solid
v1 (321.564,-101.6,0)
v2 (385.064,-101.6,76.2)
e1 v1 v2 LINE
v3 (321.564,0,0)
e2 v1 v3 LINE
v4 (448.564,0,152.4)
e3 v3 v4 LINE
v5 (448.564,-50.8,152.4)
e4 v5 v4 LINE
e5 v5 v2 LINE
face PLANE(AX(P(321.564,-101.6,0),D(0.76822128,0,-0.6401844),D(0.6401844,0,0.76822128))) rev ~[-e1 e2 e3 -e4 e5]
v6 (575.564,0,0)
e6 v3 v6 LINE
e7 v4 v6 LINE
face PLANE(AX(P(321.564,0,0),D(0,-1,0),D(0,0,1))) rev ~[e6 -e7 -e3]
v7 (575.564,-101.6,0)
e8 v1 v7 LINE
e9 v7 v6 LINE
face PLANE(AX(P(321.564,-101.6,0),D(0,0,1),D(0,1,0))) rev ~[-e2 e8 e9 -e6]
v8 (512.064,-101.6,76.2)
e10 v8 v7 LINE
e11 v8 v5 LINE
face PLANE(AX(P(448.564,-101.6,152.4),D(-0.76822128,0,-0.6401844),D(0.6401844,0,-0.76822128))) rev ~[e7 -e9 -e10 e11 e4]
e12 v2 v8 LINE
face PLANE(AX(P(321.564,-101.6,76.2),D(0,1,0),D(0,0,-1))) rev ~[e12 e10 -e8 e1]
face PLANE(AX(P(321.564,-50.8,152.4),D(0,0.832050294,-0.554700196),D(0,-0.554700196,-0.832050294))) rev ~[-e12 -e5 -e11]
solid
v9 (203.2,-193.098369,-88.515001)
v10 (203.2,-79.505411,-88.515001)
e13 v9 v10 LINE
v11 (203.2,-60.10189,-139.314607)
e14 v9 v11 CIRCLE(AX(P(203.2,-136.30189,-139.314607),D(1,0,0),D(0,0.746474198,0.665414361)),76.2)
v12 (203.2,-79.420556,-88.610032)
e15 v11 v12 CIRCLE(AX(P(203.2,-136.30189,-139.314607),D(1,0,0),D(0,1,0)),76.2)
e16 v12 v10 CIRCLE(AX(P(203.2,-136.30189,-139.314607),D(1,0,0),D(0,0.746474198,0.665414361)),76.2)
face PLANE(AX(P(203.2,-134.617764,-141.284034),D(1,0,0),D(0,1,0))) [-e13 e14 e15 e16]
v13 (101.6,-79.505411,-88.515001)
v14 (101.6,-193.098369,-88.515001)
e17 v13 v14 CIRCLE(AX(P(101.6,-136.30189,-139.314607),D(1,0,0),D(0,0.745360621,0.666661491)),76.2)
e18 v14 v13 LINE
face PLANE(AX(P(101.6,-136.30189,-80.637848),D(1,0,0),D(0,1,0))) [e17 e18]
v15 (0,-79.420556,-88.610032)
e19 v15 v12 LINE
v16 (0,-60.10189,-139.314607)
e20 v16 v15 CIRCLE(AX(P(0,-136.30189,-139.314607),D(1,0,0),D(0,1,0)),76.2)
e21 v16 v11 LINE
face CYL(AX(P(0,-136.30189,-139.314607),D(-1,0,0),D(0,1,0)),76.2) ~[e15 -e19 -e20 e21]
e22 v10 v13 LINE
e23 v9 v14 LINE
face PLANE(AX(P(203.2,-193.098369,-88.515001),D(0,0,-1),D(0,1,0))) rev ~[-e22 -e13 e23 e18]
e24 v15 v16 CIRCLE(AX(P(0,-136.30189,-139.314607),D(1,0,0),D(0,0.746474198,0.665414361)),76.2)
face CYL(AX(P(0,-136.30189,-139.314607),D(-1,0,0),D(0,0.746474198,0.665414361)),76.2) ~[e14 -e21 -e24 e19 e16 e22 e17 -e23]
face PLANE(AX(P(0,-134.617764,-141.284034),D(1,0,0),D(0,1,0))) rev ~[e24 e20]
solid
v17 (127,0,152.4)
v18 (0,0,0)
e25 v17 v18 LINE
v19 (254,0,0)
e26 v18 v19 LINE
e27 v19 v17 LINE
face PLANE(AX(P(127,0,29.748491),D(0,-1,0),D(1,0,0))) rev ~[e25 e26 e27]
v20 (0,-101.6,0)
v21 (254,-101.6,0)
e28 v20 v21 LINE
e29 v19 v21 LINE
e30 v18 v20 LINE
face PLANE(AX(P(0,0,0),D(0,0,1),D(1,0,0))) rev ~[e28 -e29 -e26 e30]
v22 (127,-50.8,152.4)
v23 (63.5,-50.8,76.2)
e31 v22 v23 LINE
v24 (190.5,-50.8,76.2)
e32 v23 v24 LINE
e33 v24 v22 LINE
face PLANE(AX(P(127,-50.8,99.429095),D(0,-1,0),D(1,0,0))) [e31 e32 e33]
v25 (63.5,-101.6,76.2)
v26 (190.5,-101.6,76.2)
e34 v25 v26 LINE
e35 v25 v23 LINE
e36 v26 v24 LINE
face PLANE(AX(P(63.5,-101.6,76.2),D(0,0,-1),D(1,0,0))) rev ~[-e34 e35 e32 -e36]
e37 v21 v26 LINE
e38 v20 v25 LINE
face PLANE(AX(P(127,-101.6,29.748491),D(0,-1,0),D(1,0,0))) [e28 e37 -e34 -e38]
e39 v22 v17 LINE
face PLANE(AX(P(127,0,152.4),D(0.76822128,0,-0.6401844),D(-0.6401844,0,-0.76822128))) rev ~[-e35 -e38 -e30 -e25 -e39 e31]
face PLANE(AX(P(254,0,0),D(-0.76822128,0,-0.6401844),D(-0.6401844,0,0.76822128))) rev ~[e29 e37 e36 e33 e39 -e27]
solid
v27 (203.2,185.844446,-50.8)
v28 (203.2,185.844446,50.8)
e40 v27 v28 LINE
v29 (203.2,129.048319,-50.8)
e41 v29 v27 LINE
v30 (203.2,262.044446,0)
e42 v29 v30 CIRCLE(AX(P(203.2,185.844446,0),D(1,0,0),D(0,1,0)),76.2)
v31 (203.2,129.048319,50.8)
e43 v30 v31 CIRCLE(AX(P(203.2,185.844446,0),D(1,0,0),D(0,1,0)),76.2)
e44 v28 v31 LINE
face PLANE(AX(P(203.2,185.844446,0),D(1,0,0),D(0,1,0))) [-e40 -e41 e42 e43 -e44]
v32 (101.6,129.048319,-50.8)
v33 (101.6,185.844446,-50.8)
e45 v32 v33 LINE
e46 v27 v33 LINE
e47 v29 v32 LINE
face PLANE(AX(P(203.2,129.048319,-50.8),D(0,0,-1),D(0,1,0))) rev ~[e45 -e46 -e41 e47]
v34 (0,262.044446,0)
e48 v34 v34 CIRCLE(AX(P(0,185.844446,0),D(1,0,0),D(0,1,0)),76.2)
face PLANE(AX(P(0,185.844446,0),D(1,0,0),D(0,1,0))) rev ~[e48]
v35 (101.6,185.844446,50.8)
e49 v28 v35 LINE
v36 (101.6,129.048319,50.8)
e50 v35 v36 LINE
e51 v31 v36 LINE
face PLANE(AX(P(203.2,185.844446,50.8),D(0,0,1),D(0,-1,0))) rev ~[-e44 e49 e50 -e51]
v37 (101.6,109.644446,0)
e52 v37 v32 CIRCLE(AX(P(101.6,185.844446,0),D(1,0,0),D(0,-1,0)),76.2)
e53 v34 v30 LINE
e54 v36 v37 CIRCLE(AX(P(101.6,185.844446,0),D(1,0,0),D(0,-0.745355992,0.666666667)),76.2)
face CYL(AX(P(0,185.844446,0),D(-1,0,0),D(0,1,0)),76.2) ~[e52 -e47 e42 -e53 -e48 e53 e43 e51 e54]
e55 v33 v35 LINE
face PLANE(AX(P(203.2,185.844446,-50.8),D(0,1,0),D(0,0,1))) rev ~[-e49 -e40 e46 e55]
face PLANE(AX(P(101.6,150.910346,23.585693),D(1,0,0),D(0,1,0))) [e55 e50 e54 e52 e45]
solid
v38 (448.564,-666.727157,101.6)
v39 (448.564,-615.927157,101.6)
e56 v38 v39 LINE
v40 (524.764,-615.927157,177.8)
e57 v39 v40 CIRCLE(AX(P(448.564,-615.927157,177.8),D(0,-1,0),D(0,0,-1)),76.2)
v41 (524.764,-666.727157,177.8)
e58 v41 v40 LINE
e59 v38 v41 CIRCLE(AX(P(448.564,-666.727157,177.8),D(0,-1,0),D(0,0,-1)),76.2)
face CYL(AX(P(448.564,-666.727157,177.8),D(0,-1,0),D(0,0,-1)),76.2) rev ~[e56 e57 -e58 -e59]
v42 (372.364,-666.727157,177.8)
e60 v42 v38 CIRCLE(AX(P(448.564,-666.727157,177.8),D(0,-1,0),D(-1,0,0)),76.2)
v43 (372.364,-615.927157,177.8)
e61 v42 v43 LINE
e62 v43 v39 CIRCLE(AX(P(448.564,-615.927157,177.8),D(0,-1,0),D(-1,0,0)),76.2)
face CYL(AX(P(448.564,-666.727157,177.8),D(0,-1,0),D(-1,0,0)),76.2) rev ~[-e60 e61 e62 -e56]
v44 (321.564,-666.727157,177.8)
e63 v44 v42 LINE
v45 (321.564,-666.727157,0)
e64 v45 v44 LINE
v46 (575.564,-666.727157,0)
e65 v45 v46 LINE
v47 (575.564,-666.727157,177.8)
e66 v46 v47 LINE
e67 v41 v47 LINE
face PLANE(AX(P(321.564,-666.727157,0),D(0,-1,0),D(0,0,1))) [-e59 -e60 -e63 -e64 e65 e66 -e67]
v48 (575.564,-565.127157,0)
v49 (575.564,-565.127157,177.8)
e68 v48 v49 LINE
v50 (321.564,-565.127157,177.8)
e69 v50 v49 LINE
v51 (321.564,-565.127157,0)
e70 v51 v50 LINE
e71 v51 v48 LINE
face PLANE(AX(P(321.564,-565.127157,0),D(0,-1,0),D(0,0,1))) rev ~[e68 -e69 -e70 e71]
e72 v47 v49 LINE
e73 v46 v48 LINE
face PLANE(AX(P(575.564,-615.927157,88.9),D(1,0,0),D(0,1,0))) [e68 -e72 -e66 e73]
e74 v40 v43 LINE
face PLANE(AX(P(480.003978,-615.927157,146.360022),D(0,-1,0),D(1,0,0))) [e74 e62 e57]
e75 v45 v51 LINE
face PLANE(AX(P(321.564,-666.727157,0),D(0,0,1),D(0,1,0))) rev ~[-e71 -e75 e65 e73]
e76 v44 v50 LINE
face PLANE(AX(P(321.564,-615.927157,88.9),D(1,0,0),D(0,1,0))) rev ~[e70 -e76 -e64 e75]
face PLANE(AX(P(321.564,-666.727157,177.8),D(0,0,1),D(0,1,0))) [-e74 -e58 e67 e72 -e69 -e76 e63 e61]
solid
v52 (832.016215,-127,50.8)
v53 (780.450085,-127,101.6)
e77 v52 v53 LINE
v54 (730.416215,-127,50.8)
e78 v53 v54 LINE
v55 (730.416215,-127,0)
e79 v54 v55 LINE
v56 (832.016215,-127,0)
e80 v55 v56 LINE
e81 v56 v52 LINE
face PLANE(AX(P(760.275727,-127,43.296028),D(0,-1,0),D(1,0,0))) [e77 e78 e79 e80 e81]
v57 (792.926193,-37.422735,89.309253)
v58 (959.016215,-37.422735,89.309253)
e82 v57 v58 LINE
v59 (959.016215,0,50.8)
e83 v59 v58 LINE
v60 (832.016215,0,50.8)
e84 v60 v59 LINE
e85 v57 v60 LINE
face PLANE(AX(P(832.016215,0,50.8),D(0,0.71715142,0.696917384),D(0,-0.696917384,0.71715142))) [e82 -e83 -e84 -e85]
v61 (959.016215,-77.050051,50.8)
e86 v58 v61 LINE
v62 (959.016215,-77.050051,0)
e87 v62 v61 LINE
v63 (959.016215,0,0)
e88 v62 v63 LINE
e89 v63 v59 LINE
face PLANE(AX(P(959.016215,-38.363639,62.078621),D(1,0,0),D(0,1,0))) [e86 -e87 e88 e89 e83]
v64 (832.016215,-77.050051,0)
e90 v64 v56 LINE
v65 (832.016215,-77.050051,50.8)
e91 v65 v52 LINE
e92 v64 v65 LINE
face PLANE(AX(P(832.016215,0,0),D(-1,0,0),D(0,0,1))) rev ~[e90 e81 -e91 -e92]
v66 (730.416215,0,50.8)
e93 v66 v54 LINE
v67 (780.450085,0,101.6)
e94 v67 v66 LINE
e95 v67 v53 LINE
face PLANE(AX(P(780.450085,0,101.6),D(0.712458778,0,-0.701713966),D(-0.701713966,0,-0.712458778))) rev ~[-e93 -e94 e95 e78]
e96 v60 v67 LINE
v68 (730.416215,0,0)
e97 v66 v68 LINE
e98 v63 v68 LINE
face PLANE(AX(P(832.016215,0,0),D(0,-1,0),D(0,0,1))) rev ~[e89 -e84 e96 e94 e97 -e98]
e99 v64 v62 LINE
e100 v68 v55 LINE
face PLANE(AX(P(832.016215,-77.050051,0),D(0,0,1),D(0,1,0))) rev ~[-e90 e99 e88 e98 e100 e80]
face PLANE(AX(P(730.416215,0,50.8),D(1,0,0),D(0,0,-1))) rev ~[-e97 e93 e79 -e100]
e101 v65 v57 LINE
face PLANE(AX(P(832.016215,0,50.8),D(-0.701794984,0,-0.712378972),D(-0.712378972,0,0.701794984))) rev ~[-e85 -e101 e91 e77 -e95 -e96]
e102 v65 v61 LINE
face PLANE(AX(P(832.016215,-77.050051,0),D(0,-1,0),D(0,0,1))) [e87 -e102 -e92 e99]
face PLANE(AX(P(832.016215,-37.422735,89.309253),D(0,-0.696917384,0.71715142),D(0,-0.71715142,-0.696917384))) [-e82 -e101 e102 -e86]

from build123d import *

# Parameters (mm, degrees)
F1_DEPTH  = 101.6
F3_DEPTH  = 50.8
F5_DEPTH  = 50.8
F8_DEPTH  = 254
F10_DEPTH = 101.6
F12_DEPTH = 127
F13_W     = 77.0500511372
F13_H     = 50.8
F14_DEPTH = 127
F17_DEPTH = 203.2
F20_DEPTH = 101.6
F22_DEPTH = 203.2
F24_DEPTH = 101.6
F25_W     = 101.6
F25_H     = 177.8
F26_DEPTH = 254
F28_DEPTH = 50.8


# Not quite as in the source:
# - a feature of the source that left no trace in its solid (it failed there, or was rolled back) is left out


with BuildPart() as f1:
    # F0 (on Front) → F1 (new body)
    with BuildSketch(Plane.XZ):
        Polygon((63.5, 76.2), (0, 0), (254, 0), (190.5, 76.2), align=None)
        Polygon((127, 152.4), (63.5, 76.2), (190.5, 76.2), align=None)
    extrude(amount=F1_DEPTH)

    # F2 (on face) → F3 (join)
    with BuildSketch(Plane.XZ.offset(101.6)):
        Polygon((127, 152.4), (63.5, 76.2), (190.5, 76.2), align=None)
    extrude(amount=-F3_DEPTH)

    # F4 (on face) → F5 (cut)
    with BuildSketch(Plane.XZ.offset(101.6)):
        Polygon((127, 152.4), (63.5, 76.2), (190.5, 76.2), align=None)
    extrude(amount=-F5_DEPTH, mode=Mode.SUBTRACT)


with BuildPart() as f8:
    # F7 (on offset) → F8 (new body)
    with BuildSketch(Plane.YZ.offset(321.564)):
        Polygon((-101.6, 0), (0, 0), (0, 152.4), (-50.8, 152.4), (-101.6, 76.2), align=None)
    extrude(amount=F8_DEPTH)

    # F9 (on face) → F10 (cut)
    with BuildSketch(Plane.XZ.offset(101.6)):
        Polygon((321.564, 76.2), (385.064, 76.2), (448.564, 152.4), (321.564, 152.4), align=None)
        Polygon((321.564, 76.2), (321.564, 0), (385.064, 76.2), align=None)
        Polygon((512.064, 76.2), (575.564, 0), (575.564, 76.2), align=None)
        Polygon((448.564, 152.4), (512.064, 76.2), (575.564, 76.2), (575.564, 152.4), align=None)
    extrude(amount=-F10_DEPTH, mode=Mode.SUBTRACT)


with BuildPart() as f12:
    # F11 (on Front) → F12 (new body)
    with BuildSketch(Plane.XZ):
        Polygon((730.4162154386, 50.8), (730.4162154386, 0), (781.2162154386, 0), (780.4500848747, 101.6), align=None)
        Polygon((780.4500848747, 101.6), (781.2162154386, 0), (832.0162154386, 0), (832.0162154386, 50.8), align=None)
    extrude(amount=F12_DEPTH)

    # F13 (on face) → F14 (join)
    with BuildSketch(Plane.YZ.offset(832.0162154386)):
        Polygon((-77.0500511372, 50.8), (0, 50.8), (-37.422735244, 89.3092527986), align=None)
        with Locations((-38.5250255686, 25.4)):
            Rectangle(F13_W, F13_H)
    extrude(amount=F14_DEPTH)

    # F13 (on face) → F15 (join, up to the next surface of F12)
    with BuildSketch(Plane.YZ.offset(832.0162154386)):
        Polygon((-77.0500511372, 50.8), (0, 50.8), (-37.422735244, 89.3092527986), align=None)
    extrude(until=Until.NEXT, dir=(-1, 0, 0))


with BuildPart() as f17:
    # F16 (on Right) → F17 (new body)
    with BuildSketch(Plane.YZ):
        with BuildLine():
            ThreePointArc((-136.3018900156, -215.5146067858), (-82.4203532892, -193.1961435122), (-60.1018900156, -139.3146067858))
            ThreePointArc((-60.1018900156, -139.3146067858), (-65.0951570451, -112.1845279125), (-79.4205561487, -88.6100324604))
            Line((-79.4205561487, -88.6100324604), (-140.1142077817, -88.6100324604))
            Line((-140.1142077817, -88.6100324604), (-193.1832238825, -88.6100324604))
            ThreePointArc((-193.1832238825, -88.6100324604), (-205.8365165106, -170.4815077899), (-136.3018900156, -215.5146067858))
        make_face()
        with BuildLine():
            Line((-140.1142077817, -88.6100324604), (-79.4205561487, -88.6100324604))
            ThreePointArc((-79.4205561487, -88.6100324604), (-136.3018900156, -63.1146067858), (-193.1832238825, -88.6100324604))
            Line((-193.1832238825, -88.6100324604), (-140.1142077817, -88.6100324604))
        make_face()
    extrude(amount=F17_DEPTH)

    # F18 (on face) → F20 (cut)
    with BuildSketch(Plane.YZ.offset(203.2)):
        with BuildLine():
            Line((-193.0983693738, -88.5150011523), (-136.5470457015, -88.5150011523))
            Line((-136.5470457015, -88.5150011523), (-79.5054106574, -88.5150011523))
            ThreePointArc((-79.5054106574, -88.5150011523), (-136.3018900156, -63.1146067858), (-193.0983693738, -88.5150011523))
        make_face()
    extrude(amount=-F20_DEPTH, mode=Mode.SUBTRACT)


with BuildPart() as f22:
    # F21 (on Right) → F22 (new body)
    with BuildSketch(Plane.YZ):
        with BuildLine():
            ThreePointArc((185.844445633, 76.2), (131.9629089065, -53.8815367264), (262.044445633, 0))
            ThreePointArc((262.044445633, 0), (239.7259823594, 53.8815367264), (185.844445633, 76.2))
        make_face()
    extrude(amount=F22_DEPTH)

    # F23 (on face) → F24 (cut)
    with BuildSketch(Plane.YZ.offset(203.2)):
        with BuildLine():
            ThreePointArc((129.0483190045, 50.8), (114.66051188, 27.1898432407), (109.644445633, 0))
            Line((109.644445633, 0), (185.844445633, 0))
            Line((185.844445633, 0), (185.844445633, 50.8))
            Line((185.844445633, 50.8), (129.0483190045, 50.8))
        make_face()
        with BuildLine():
            Line((185.844445633, 0), (109.644445633, 0))
            ThreePointArc((109.644445633, 0), (114.66051188, -27.1898432407), (129.0483190045, -50.8))
            Line((129.0483190045, -50.8), (185.844445633, -50.8))
            Line((185.844445633, -50.8), (185.844445633, 0))
        make_face()
    extrude(amount=-F24_DEPTH, mode=Mode.SUBTRACT)


with BuildPart() as f26:
    # F25 (on offset) → F26 (new body)
    with BuildSketch(Plane.YZ.offset(321.564)):
        with Locations((-615.9271565277, 88.9)):
            Rectangle(F25_W, F25_H)
    extrude(amount=F26_DEPTH)

    # F27 (on face) → F28 (cut)
    with BuildSketch(Plane.XZ.offset(666.7271565277)):
        with BuildLine():
            Line((448.564, 177.8), (448.564, 101.6))
            ThreePointArc((448.564, 101.6), (502.4455367264, 123.9184632736), (524.764, 177.8))
            Line((524.764, 177.8), (448.564, 177.8))
        make_face()
        with BuildLine():
            Line((448.564, 177.8), (372.364, 177.8))
            ThreePointArc((372.364, 177.8), (394.6824632736, 123.9184632736), (448.564, 101.6))
            Line((448.564, 101.6), (448.564, 177.8))
        make_face()
    extrude(amount=-F28_DEPTH, mode=Mode.SUBTRACT)


solid = Compound([f1.part, f8.part, f12.part, f17.part, f22.part, f26.part])
